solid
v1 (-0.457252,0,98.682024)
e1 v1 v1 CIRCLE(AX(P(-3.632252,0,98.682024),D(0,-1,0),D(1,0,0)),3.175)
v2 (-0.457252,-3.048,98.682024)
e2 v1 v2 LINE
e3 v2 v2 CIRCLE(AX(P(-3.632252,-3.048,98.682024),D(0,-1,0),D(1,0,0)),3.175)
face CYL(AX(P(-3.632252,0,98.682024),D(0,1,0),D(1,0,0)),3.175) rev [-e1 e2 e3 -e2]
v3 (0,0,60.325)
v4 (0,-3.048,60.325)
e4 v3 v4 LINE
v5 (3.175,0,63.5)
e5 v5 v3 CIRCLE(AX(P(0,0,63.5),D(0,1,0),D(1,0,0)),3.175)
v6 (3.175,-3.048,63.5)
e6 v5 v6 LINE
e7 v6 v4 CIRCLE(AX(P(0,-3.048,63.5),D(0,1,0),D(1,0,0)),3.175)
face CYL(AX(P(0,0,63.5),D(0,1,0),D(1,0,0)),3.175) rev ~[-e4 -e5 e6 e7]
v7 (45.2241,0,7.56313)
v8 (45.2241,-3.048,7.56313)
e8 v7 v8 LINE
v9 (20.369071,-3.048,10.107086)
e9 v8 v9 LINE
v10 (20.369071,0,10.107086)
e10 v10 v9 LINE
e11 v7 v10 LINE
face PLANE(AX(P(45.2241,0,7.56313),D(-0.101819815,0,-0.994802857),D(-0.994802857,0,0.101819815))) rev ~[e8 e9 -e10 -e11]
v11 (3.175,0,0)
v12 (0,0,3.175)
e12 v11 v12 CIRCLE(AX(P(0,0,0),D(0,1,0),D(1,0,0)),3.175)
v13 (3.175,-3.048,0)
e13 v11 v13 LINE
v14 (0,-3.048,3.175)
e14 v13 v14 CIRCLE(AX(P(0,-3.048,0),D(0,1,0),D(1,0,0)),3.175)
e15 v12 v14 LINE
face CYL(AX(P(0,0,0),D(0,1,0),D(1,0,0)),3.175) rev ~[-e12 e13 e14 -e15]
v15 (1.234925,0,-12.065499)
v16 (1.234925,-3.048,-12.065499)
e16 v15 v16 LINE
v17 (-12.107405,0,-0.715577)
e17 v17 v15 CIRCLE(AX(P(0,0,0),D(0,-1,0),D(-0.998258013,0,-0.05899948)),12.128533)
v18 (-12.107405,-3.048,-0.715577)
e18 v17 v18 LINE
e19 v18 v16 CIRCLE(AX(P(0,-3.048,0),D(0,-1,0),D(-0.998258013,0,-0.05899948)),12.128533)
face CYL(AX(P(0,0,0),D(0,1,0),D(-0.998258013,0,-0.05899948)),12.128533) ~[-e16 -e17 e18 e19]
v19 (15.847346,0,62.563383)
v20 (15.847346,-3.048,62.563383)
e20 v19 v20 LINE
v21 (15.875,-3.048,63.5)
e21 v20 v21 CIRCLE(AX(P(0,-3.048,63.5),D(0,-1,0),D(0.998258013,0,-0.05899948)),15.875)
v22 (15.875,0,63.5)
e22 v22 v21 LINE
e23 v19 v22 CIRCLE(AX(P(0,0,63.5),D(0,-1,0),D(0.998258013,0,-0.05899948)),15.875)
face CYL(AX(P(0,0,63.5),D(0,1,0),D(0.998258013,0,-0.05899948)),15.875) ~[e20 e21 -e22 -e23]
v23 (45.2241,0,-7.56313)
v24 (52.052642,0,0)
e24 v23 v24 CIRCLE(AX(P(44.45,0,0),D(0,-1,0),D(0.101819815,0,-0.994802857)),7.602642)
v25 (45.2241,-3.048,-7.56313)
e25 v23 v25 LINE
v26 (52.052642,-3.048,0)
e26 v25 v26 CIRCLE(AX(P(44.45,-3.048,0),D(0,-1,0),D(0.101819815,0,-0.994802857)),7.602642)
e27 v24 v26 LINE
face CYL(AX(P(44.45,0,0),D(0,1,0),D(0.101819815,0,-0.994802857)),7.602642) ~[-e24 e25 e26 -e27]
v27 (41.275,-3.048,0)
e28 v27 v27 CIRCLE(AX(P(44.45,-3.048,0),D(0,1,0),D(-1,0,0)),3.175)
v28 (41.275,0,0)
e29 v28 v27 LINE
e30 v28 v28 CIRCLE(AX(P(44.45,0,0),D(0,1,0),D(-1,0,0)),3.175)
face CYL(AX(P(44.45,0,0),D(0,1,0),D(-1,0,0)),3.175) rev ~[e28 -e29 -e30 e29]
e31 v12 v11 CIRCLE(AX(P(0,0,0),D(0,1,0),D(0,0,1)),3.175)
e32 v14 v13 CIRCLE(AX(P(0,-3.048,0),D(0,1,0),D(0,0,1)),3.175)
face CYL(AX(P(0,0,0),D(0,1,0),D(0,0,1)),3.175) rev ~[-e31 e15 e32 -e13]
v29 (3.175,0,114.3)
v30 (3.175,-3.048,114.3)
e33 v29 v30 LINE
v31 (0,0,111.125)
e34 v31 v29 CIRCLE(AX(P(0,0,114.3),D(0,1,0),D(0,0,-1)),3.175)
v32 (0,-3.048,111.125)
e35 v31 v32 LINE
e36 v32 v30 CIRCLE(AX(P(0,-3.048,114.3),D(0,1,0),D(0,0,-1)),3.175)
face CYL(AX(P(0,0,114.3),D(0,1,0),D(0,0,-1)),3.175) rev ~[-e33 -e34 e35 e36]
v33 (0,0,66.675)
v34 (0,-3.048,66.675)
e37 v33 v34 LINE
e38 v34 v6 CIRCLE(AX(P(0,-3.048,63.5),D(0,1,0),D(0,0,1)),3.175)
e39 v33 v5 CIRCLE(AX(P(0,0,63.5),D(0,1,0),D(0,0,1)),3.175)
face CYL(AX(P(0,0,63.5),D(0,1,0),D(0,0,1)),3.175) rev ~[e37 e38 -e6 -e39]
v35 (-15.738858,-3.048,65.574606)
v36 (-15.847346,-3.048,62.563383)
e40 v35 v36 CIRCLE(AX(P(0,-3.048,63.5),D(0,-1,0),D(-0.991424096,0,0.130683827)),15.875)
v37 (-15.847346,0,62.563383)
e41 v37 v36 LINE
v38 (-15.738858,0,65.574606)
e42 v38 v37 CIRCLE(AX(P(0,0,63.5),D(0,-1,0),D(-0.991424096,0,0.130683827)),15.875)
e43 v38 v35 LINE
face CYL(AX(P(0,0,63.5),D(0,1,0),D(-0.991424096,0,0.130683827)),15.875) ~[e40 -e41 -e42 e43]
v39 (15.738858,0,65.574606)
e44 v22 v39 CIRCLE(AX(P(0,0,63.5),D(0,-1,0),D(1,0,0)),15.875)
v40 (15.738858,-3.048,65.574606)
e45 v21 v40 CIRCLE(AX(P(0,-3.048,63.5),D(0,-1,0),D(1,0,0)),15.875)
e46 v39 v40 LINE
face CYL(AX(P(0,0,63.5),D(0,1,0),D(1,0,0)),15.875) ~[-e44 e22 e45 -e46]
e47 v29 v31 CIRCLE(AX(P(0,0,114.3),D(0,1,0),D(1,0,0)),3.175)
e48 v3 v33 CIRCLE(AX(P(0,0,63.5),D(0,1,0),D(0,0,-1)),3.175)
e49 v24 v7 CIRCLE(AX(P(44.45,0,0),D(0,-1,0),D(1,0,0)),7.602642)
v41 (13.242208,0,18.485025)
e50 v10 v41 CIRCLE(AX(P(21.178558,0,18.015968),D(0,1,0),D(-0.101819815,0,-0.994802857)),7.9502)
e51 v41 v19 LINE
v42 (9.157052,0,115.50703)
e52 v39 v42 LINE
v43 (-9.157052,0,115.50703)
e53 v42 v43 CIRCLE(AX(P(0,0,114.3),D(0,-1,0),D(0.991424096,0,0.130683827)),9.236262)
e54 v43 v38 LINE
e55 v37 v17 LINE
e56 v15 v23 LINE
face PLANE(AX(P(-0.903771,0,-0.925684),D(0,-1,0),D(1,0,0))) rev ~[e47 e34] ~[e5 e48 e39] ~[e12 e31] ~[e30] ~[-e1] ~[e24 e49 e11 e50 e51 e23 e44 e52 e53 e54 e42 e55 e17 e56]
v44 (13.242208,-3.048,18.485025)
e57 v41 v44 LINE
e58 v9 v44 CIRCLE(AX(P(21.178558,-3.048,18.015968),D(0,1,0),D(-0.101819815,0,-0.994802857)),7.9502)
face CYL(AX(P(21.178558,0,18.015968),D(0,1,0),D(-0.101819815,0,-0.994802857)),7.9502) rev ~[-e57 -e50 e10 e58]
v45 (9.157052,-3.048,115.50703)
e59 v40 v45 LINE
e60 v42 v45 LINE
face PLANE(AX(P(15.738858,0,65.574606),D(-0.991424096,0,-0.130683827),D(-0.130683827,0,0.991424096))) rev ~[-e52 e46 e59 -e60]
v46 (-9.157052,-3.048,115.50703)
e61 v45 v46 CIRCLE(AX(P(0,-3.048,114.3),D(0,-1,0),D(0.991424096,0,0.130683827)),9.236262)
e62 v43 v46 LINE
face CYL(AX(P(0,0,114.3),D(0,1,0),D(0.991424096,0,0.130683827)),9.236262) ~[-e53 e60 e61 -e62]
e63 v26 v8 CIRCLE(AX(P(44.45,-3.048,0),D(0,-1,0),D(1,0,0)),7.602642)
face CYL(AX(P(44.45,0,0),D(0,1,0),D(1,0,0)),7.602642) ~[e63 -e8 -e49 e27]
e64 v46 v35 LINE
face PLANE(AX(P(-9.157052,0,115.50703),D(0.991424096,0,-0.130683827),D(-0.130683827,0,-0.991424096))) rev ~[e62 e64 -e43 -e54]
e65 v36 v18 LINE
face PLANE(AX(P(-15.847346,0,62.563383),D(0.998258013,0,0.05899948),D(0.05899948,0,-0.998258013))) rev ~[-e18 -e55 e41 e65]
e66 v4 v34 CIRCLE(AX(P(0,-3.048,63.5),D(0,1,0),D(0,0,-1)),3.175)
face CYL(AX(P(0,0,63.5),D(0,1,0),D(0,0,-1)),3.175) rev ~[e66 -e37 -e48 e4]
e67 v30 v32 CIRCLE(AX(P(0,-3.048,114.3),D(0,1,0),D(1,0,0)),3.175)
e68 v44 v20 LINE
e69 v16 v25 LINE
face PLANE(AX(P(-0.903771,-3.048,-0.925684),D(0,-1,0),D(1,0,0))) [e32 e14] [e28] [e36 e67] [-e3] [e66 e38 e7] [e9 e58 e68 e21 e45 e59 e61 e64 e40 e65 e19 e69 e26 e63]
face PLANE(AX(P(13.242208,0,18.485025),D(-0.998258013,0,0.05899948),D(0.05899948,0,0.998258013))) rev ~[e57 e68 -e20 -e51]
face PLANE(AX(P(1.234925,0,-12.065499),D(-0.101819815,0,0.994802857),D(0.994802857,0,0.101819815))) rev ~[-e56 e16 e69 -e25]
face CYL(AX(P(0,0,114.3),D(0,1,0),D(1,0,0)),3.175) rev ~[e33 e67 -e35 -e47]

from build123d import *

# Parameters (mm, degrees)
F0_R     = 3.175
F1_DEPTH = 3.048


with BuildPart() as f1:
    # F0 (on Front) → F1 (new body)
    with BuildSketch(Plane.XZ):
        with BuildLine():
            Line((12.1285329959, 0), (3.175, 0))
            ThreePointArc((3.175, 0), (-2.2450640303, -2.2450640303), (0, 3.175))
            Line((0, 3.175), (0, 12.1285329959))
            ThreePointArc((0, 12.1285329959), (-8.8255371973, 8.3193272451), (-12.1074052539, -0.7155771445))
            ThreePointArc((-12.1074052539, -0.7155771445), (-7.858618829, -9.2381503956), (1.2349249899, -12.0654992811))
            ThreePointArc((1.2349249899, -12.0654992811), (9.002198096, -8.1278374782), (12.1285329959, 0))
        make_face()
        with BuildLine():
            ThreePointArc((0, 12.1285329959), (8.5761679272, 8.5761679272), (12.1285329959, 0))
            Line((12.1285329959, 0), (36.8473577956, 0))
            ThreePointArc((36.8473577956, 0), (39.3551513268, 5.6429323481), (45.2240996253, 7.5631301892))
            Line((45.2240996253, 7.5631301892), (20.3690705941, 10.1070859559))
            ThreePointArc((20.3690705941, 10.1070859559), (15.1229915635, 12.8646775774), (13.2422076318, 18.4850253022))
            Line((13.2422076318, 18.4850253022), (15.8473459627, 62.563383249))
            ThreePointArc((15.8473459627, 62.563383249), (10.8891421627, 51.9482811685), (0, 47.625))
            Line((0, 47.625), (0, 12.1285329959))
        make_face()
        with BuildLine():
            Line((36.8473577956, 0), (12.1285329959, 0))
            ThreePointArc((12.1285329959, 0), (9.002198096, -8.1278374782), (1.2349249899, -12.0654992811))
            Line((1.2349249899, -12.0654992811), (45.2240996253, -7.5631301892))
            ThreePointArc((45.2240996253, -7.5631301892), (39.3551513268, -5.6429323481), (36.8473577956, 0))
        make_face()
        with BuildLine():
            ThreePointArc((-12.1074052539, -0.7155771445), (-8.8255371973, 8.3193272451), (0, 12.1285329959))
            Line((0, 12.1285329959), (0, 47.625))
            ThreePointArc((0, 47.625), (-10.8891421627, 51.9482811685), (-15.8473459627, 62.563383249))
            Line((-15.8473459627, 62.563383249), (-12.1074052539, -0.7155771445))
        make_face()
        with BuildLine():
            ThreePointArc((45.2240996253, 7.5631301892), (39.3551513268, 5.6429323481), (36.8473577956, 0))
            ThreePointArc((36.8473577956, 0), (39.3551513268, -5.6429323481), (45.2240996253, -7.5631301892))
            ThreePointArc((45.2240996253, -7.5631301892), (50.0929323481, -5.0948486732), (52.0526422044, 0))
            ThreePointArc((52.0526422044, 0), (50.0929323481, 5.0948486732), (45.2240996253, 7.5631301892))
        make_face()
        with BuildLine():
            ThreePointArc((47.625, 0), (44.45, -3.175), (41.275, 0))
            ThreePointArc((41.275, 0), (44.45, 3.175), (47.625, 0))
        make_face(mode=Mode.SUBTRACT)
        with BuildLine():
            ThreePointArc((-15.8473459627, 62.563383249), (-10.8891421627, 51.9482811685), (0, 47.625))
            Line((0, 47.625), (0, 60.325))
            ThreePointArc((0, 60.325), (-3.175, 63.5), (0, 66.675))
            Line((0, 66.675), (0, 79.375))
            ThreePointArc((0, 79.375), (-10.4661659349, 75.4362890222), (-15.7388575186, 65.5746057477))
            ThreePointArc((-15.7388575186, 65.5746057477), (-15.8647069883, 64.071574295), (-15.8473459627, 62.563383249))
        make_face()
        with BuildLine():
            Line((0, 60.325), (0, 47.625))
            ThreePointArc((0, 47.625), (10.8891421627, 51.9482811685), (15.8473459627, 62.563383249))
            ThreePointArc((15.8473459627, 62.563383249), (15.8680849846, 63.0314875444), (15.875, 63.5))
            ThreePointArc((15.875, 63.5), (15.8409278154, 64.5395340042), (15.7388575186, 65.5746057477))
            ThreePointArc((15.7388575186, 65.5746057477), (10.4661659349, 75.4362890222), (0, 79.375))
            Line((0, 79.375), (0, 66.675))
            ThreePointArc((0, 66.675), (2.2450640303, 65.7450640303), (3.175, 63.5))
            ThreePointArc((3.175, 63.5), (2.2450640303, 61.2549359697), (0, 60.325))
        make_face()
        with BuildLine():
            Line((-9.1570523114, 115.5070300106), (-15.7388575186, 65.5746057477))
            ThreePointArc((-15.7388575186, 65.5746057477), (-10.4661659349, 75.4362890222), (0, 79.375))
            Line((0, 79.375), (0, 105.0637383927))
            ThreePointArc((0, 105.0637383927), (-6.9446732617, 108.2106616314), (-9.1570523114, 115.5070300106))
        make_face()
        with Locations((-3.6322516389, 98.6820235848)):
            Circle(F0_R, mode=Mode.SUBTRACT)
        with BuildLine():
            Line((0, 105.0637383927), (0, 79.375))
            ThreePointArc((0, 79.375), (10.4661659349, 75.4362890222), (15.7388575186, 65.5746057477))
            Line((15.7388575186, 65.5746057477), (9.1570523114, 115.5070300106))
            ThreePointArc((9.1570523114, 115.5070300106), (9.2164380099, 114.9048131032), (9.2362616073, 114.3))
            ThreePointArc((9.2362616073, 114.3), (6.5310232154, 107.7689767846), (0, 105.0637383927))
        make_face()
        with BuildLine():
            ThreePointArc((9.1570523114, 115.5070300106), (0, 123.5362616073), (-9.1570523114, 115.5070300106))
            ThreePointArc((-9.1570523114, 115.5070300106), (-6.9446732617, 108.2106616314), (0, 105.0637383927))
            ThreePointArc((0, 105.0637383927), (6.5310232154, 107.7689767846), (9.2362616073, 114.3))
            ThreePointArc((9.2362616073, 114.3), (9.2164380099, 114.9048131032), (9.1570523114, 115.5070300106))
        make_face()
        with BuildLine():
            ThreePointArc((3.175, 114.3), (2.2450640303, 112.0549359697), (0, 111.125))
            ThreePointArc((0, 111.125), (-2.2450640303, 116.5450640303), (3.175, 114.3))
        make_face(mode=Mode.SUBTRACT)
        with BuildLine():
            ThreePointArc((0, 3.175), (2.2450640303, 2.2450640303), (3.175, 0))
            Line((3.175, 0), (12.1285329959, 0))
            ThreePointArc((12.1285329959, 0), (8.5761679272, 8.5761679272), (0, 12.1285329959))
            Line((0, 12.1285329959), (0, 3.175))
        make_face()
    extrude(amount=F1_DEPTH)


solid = f1.part
